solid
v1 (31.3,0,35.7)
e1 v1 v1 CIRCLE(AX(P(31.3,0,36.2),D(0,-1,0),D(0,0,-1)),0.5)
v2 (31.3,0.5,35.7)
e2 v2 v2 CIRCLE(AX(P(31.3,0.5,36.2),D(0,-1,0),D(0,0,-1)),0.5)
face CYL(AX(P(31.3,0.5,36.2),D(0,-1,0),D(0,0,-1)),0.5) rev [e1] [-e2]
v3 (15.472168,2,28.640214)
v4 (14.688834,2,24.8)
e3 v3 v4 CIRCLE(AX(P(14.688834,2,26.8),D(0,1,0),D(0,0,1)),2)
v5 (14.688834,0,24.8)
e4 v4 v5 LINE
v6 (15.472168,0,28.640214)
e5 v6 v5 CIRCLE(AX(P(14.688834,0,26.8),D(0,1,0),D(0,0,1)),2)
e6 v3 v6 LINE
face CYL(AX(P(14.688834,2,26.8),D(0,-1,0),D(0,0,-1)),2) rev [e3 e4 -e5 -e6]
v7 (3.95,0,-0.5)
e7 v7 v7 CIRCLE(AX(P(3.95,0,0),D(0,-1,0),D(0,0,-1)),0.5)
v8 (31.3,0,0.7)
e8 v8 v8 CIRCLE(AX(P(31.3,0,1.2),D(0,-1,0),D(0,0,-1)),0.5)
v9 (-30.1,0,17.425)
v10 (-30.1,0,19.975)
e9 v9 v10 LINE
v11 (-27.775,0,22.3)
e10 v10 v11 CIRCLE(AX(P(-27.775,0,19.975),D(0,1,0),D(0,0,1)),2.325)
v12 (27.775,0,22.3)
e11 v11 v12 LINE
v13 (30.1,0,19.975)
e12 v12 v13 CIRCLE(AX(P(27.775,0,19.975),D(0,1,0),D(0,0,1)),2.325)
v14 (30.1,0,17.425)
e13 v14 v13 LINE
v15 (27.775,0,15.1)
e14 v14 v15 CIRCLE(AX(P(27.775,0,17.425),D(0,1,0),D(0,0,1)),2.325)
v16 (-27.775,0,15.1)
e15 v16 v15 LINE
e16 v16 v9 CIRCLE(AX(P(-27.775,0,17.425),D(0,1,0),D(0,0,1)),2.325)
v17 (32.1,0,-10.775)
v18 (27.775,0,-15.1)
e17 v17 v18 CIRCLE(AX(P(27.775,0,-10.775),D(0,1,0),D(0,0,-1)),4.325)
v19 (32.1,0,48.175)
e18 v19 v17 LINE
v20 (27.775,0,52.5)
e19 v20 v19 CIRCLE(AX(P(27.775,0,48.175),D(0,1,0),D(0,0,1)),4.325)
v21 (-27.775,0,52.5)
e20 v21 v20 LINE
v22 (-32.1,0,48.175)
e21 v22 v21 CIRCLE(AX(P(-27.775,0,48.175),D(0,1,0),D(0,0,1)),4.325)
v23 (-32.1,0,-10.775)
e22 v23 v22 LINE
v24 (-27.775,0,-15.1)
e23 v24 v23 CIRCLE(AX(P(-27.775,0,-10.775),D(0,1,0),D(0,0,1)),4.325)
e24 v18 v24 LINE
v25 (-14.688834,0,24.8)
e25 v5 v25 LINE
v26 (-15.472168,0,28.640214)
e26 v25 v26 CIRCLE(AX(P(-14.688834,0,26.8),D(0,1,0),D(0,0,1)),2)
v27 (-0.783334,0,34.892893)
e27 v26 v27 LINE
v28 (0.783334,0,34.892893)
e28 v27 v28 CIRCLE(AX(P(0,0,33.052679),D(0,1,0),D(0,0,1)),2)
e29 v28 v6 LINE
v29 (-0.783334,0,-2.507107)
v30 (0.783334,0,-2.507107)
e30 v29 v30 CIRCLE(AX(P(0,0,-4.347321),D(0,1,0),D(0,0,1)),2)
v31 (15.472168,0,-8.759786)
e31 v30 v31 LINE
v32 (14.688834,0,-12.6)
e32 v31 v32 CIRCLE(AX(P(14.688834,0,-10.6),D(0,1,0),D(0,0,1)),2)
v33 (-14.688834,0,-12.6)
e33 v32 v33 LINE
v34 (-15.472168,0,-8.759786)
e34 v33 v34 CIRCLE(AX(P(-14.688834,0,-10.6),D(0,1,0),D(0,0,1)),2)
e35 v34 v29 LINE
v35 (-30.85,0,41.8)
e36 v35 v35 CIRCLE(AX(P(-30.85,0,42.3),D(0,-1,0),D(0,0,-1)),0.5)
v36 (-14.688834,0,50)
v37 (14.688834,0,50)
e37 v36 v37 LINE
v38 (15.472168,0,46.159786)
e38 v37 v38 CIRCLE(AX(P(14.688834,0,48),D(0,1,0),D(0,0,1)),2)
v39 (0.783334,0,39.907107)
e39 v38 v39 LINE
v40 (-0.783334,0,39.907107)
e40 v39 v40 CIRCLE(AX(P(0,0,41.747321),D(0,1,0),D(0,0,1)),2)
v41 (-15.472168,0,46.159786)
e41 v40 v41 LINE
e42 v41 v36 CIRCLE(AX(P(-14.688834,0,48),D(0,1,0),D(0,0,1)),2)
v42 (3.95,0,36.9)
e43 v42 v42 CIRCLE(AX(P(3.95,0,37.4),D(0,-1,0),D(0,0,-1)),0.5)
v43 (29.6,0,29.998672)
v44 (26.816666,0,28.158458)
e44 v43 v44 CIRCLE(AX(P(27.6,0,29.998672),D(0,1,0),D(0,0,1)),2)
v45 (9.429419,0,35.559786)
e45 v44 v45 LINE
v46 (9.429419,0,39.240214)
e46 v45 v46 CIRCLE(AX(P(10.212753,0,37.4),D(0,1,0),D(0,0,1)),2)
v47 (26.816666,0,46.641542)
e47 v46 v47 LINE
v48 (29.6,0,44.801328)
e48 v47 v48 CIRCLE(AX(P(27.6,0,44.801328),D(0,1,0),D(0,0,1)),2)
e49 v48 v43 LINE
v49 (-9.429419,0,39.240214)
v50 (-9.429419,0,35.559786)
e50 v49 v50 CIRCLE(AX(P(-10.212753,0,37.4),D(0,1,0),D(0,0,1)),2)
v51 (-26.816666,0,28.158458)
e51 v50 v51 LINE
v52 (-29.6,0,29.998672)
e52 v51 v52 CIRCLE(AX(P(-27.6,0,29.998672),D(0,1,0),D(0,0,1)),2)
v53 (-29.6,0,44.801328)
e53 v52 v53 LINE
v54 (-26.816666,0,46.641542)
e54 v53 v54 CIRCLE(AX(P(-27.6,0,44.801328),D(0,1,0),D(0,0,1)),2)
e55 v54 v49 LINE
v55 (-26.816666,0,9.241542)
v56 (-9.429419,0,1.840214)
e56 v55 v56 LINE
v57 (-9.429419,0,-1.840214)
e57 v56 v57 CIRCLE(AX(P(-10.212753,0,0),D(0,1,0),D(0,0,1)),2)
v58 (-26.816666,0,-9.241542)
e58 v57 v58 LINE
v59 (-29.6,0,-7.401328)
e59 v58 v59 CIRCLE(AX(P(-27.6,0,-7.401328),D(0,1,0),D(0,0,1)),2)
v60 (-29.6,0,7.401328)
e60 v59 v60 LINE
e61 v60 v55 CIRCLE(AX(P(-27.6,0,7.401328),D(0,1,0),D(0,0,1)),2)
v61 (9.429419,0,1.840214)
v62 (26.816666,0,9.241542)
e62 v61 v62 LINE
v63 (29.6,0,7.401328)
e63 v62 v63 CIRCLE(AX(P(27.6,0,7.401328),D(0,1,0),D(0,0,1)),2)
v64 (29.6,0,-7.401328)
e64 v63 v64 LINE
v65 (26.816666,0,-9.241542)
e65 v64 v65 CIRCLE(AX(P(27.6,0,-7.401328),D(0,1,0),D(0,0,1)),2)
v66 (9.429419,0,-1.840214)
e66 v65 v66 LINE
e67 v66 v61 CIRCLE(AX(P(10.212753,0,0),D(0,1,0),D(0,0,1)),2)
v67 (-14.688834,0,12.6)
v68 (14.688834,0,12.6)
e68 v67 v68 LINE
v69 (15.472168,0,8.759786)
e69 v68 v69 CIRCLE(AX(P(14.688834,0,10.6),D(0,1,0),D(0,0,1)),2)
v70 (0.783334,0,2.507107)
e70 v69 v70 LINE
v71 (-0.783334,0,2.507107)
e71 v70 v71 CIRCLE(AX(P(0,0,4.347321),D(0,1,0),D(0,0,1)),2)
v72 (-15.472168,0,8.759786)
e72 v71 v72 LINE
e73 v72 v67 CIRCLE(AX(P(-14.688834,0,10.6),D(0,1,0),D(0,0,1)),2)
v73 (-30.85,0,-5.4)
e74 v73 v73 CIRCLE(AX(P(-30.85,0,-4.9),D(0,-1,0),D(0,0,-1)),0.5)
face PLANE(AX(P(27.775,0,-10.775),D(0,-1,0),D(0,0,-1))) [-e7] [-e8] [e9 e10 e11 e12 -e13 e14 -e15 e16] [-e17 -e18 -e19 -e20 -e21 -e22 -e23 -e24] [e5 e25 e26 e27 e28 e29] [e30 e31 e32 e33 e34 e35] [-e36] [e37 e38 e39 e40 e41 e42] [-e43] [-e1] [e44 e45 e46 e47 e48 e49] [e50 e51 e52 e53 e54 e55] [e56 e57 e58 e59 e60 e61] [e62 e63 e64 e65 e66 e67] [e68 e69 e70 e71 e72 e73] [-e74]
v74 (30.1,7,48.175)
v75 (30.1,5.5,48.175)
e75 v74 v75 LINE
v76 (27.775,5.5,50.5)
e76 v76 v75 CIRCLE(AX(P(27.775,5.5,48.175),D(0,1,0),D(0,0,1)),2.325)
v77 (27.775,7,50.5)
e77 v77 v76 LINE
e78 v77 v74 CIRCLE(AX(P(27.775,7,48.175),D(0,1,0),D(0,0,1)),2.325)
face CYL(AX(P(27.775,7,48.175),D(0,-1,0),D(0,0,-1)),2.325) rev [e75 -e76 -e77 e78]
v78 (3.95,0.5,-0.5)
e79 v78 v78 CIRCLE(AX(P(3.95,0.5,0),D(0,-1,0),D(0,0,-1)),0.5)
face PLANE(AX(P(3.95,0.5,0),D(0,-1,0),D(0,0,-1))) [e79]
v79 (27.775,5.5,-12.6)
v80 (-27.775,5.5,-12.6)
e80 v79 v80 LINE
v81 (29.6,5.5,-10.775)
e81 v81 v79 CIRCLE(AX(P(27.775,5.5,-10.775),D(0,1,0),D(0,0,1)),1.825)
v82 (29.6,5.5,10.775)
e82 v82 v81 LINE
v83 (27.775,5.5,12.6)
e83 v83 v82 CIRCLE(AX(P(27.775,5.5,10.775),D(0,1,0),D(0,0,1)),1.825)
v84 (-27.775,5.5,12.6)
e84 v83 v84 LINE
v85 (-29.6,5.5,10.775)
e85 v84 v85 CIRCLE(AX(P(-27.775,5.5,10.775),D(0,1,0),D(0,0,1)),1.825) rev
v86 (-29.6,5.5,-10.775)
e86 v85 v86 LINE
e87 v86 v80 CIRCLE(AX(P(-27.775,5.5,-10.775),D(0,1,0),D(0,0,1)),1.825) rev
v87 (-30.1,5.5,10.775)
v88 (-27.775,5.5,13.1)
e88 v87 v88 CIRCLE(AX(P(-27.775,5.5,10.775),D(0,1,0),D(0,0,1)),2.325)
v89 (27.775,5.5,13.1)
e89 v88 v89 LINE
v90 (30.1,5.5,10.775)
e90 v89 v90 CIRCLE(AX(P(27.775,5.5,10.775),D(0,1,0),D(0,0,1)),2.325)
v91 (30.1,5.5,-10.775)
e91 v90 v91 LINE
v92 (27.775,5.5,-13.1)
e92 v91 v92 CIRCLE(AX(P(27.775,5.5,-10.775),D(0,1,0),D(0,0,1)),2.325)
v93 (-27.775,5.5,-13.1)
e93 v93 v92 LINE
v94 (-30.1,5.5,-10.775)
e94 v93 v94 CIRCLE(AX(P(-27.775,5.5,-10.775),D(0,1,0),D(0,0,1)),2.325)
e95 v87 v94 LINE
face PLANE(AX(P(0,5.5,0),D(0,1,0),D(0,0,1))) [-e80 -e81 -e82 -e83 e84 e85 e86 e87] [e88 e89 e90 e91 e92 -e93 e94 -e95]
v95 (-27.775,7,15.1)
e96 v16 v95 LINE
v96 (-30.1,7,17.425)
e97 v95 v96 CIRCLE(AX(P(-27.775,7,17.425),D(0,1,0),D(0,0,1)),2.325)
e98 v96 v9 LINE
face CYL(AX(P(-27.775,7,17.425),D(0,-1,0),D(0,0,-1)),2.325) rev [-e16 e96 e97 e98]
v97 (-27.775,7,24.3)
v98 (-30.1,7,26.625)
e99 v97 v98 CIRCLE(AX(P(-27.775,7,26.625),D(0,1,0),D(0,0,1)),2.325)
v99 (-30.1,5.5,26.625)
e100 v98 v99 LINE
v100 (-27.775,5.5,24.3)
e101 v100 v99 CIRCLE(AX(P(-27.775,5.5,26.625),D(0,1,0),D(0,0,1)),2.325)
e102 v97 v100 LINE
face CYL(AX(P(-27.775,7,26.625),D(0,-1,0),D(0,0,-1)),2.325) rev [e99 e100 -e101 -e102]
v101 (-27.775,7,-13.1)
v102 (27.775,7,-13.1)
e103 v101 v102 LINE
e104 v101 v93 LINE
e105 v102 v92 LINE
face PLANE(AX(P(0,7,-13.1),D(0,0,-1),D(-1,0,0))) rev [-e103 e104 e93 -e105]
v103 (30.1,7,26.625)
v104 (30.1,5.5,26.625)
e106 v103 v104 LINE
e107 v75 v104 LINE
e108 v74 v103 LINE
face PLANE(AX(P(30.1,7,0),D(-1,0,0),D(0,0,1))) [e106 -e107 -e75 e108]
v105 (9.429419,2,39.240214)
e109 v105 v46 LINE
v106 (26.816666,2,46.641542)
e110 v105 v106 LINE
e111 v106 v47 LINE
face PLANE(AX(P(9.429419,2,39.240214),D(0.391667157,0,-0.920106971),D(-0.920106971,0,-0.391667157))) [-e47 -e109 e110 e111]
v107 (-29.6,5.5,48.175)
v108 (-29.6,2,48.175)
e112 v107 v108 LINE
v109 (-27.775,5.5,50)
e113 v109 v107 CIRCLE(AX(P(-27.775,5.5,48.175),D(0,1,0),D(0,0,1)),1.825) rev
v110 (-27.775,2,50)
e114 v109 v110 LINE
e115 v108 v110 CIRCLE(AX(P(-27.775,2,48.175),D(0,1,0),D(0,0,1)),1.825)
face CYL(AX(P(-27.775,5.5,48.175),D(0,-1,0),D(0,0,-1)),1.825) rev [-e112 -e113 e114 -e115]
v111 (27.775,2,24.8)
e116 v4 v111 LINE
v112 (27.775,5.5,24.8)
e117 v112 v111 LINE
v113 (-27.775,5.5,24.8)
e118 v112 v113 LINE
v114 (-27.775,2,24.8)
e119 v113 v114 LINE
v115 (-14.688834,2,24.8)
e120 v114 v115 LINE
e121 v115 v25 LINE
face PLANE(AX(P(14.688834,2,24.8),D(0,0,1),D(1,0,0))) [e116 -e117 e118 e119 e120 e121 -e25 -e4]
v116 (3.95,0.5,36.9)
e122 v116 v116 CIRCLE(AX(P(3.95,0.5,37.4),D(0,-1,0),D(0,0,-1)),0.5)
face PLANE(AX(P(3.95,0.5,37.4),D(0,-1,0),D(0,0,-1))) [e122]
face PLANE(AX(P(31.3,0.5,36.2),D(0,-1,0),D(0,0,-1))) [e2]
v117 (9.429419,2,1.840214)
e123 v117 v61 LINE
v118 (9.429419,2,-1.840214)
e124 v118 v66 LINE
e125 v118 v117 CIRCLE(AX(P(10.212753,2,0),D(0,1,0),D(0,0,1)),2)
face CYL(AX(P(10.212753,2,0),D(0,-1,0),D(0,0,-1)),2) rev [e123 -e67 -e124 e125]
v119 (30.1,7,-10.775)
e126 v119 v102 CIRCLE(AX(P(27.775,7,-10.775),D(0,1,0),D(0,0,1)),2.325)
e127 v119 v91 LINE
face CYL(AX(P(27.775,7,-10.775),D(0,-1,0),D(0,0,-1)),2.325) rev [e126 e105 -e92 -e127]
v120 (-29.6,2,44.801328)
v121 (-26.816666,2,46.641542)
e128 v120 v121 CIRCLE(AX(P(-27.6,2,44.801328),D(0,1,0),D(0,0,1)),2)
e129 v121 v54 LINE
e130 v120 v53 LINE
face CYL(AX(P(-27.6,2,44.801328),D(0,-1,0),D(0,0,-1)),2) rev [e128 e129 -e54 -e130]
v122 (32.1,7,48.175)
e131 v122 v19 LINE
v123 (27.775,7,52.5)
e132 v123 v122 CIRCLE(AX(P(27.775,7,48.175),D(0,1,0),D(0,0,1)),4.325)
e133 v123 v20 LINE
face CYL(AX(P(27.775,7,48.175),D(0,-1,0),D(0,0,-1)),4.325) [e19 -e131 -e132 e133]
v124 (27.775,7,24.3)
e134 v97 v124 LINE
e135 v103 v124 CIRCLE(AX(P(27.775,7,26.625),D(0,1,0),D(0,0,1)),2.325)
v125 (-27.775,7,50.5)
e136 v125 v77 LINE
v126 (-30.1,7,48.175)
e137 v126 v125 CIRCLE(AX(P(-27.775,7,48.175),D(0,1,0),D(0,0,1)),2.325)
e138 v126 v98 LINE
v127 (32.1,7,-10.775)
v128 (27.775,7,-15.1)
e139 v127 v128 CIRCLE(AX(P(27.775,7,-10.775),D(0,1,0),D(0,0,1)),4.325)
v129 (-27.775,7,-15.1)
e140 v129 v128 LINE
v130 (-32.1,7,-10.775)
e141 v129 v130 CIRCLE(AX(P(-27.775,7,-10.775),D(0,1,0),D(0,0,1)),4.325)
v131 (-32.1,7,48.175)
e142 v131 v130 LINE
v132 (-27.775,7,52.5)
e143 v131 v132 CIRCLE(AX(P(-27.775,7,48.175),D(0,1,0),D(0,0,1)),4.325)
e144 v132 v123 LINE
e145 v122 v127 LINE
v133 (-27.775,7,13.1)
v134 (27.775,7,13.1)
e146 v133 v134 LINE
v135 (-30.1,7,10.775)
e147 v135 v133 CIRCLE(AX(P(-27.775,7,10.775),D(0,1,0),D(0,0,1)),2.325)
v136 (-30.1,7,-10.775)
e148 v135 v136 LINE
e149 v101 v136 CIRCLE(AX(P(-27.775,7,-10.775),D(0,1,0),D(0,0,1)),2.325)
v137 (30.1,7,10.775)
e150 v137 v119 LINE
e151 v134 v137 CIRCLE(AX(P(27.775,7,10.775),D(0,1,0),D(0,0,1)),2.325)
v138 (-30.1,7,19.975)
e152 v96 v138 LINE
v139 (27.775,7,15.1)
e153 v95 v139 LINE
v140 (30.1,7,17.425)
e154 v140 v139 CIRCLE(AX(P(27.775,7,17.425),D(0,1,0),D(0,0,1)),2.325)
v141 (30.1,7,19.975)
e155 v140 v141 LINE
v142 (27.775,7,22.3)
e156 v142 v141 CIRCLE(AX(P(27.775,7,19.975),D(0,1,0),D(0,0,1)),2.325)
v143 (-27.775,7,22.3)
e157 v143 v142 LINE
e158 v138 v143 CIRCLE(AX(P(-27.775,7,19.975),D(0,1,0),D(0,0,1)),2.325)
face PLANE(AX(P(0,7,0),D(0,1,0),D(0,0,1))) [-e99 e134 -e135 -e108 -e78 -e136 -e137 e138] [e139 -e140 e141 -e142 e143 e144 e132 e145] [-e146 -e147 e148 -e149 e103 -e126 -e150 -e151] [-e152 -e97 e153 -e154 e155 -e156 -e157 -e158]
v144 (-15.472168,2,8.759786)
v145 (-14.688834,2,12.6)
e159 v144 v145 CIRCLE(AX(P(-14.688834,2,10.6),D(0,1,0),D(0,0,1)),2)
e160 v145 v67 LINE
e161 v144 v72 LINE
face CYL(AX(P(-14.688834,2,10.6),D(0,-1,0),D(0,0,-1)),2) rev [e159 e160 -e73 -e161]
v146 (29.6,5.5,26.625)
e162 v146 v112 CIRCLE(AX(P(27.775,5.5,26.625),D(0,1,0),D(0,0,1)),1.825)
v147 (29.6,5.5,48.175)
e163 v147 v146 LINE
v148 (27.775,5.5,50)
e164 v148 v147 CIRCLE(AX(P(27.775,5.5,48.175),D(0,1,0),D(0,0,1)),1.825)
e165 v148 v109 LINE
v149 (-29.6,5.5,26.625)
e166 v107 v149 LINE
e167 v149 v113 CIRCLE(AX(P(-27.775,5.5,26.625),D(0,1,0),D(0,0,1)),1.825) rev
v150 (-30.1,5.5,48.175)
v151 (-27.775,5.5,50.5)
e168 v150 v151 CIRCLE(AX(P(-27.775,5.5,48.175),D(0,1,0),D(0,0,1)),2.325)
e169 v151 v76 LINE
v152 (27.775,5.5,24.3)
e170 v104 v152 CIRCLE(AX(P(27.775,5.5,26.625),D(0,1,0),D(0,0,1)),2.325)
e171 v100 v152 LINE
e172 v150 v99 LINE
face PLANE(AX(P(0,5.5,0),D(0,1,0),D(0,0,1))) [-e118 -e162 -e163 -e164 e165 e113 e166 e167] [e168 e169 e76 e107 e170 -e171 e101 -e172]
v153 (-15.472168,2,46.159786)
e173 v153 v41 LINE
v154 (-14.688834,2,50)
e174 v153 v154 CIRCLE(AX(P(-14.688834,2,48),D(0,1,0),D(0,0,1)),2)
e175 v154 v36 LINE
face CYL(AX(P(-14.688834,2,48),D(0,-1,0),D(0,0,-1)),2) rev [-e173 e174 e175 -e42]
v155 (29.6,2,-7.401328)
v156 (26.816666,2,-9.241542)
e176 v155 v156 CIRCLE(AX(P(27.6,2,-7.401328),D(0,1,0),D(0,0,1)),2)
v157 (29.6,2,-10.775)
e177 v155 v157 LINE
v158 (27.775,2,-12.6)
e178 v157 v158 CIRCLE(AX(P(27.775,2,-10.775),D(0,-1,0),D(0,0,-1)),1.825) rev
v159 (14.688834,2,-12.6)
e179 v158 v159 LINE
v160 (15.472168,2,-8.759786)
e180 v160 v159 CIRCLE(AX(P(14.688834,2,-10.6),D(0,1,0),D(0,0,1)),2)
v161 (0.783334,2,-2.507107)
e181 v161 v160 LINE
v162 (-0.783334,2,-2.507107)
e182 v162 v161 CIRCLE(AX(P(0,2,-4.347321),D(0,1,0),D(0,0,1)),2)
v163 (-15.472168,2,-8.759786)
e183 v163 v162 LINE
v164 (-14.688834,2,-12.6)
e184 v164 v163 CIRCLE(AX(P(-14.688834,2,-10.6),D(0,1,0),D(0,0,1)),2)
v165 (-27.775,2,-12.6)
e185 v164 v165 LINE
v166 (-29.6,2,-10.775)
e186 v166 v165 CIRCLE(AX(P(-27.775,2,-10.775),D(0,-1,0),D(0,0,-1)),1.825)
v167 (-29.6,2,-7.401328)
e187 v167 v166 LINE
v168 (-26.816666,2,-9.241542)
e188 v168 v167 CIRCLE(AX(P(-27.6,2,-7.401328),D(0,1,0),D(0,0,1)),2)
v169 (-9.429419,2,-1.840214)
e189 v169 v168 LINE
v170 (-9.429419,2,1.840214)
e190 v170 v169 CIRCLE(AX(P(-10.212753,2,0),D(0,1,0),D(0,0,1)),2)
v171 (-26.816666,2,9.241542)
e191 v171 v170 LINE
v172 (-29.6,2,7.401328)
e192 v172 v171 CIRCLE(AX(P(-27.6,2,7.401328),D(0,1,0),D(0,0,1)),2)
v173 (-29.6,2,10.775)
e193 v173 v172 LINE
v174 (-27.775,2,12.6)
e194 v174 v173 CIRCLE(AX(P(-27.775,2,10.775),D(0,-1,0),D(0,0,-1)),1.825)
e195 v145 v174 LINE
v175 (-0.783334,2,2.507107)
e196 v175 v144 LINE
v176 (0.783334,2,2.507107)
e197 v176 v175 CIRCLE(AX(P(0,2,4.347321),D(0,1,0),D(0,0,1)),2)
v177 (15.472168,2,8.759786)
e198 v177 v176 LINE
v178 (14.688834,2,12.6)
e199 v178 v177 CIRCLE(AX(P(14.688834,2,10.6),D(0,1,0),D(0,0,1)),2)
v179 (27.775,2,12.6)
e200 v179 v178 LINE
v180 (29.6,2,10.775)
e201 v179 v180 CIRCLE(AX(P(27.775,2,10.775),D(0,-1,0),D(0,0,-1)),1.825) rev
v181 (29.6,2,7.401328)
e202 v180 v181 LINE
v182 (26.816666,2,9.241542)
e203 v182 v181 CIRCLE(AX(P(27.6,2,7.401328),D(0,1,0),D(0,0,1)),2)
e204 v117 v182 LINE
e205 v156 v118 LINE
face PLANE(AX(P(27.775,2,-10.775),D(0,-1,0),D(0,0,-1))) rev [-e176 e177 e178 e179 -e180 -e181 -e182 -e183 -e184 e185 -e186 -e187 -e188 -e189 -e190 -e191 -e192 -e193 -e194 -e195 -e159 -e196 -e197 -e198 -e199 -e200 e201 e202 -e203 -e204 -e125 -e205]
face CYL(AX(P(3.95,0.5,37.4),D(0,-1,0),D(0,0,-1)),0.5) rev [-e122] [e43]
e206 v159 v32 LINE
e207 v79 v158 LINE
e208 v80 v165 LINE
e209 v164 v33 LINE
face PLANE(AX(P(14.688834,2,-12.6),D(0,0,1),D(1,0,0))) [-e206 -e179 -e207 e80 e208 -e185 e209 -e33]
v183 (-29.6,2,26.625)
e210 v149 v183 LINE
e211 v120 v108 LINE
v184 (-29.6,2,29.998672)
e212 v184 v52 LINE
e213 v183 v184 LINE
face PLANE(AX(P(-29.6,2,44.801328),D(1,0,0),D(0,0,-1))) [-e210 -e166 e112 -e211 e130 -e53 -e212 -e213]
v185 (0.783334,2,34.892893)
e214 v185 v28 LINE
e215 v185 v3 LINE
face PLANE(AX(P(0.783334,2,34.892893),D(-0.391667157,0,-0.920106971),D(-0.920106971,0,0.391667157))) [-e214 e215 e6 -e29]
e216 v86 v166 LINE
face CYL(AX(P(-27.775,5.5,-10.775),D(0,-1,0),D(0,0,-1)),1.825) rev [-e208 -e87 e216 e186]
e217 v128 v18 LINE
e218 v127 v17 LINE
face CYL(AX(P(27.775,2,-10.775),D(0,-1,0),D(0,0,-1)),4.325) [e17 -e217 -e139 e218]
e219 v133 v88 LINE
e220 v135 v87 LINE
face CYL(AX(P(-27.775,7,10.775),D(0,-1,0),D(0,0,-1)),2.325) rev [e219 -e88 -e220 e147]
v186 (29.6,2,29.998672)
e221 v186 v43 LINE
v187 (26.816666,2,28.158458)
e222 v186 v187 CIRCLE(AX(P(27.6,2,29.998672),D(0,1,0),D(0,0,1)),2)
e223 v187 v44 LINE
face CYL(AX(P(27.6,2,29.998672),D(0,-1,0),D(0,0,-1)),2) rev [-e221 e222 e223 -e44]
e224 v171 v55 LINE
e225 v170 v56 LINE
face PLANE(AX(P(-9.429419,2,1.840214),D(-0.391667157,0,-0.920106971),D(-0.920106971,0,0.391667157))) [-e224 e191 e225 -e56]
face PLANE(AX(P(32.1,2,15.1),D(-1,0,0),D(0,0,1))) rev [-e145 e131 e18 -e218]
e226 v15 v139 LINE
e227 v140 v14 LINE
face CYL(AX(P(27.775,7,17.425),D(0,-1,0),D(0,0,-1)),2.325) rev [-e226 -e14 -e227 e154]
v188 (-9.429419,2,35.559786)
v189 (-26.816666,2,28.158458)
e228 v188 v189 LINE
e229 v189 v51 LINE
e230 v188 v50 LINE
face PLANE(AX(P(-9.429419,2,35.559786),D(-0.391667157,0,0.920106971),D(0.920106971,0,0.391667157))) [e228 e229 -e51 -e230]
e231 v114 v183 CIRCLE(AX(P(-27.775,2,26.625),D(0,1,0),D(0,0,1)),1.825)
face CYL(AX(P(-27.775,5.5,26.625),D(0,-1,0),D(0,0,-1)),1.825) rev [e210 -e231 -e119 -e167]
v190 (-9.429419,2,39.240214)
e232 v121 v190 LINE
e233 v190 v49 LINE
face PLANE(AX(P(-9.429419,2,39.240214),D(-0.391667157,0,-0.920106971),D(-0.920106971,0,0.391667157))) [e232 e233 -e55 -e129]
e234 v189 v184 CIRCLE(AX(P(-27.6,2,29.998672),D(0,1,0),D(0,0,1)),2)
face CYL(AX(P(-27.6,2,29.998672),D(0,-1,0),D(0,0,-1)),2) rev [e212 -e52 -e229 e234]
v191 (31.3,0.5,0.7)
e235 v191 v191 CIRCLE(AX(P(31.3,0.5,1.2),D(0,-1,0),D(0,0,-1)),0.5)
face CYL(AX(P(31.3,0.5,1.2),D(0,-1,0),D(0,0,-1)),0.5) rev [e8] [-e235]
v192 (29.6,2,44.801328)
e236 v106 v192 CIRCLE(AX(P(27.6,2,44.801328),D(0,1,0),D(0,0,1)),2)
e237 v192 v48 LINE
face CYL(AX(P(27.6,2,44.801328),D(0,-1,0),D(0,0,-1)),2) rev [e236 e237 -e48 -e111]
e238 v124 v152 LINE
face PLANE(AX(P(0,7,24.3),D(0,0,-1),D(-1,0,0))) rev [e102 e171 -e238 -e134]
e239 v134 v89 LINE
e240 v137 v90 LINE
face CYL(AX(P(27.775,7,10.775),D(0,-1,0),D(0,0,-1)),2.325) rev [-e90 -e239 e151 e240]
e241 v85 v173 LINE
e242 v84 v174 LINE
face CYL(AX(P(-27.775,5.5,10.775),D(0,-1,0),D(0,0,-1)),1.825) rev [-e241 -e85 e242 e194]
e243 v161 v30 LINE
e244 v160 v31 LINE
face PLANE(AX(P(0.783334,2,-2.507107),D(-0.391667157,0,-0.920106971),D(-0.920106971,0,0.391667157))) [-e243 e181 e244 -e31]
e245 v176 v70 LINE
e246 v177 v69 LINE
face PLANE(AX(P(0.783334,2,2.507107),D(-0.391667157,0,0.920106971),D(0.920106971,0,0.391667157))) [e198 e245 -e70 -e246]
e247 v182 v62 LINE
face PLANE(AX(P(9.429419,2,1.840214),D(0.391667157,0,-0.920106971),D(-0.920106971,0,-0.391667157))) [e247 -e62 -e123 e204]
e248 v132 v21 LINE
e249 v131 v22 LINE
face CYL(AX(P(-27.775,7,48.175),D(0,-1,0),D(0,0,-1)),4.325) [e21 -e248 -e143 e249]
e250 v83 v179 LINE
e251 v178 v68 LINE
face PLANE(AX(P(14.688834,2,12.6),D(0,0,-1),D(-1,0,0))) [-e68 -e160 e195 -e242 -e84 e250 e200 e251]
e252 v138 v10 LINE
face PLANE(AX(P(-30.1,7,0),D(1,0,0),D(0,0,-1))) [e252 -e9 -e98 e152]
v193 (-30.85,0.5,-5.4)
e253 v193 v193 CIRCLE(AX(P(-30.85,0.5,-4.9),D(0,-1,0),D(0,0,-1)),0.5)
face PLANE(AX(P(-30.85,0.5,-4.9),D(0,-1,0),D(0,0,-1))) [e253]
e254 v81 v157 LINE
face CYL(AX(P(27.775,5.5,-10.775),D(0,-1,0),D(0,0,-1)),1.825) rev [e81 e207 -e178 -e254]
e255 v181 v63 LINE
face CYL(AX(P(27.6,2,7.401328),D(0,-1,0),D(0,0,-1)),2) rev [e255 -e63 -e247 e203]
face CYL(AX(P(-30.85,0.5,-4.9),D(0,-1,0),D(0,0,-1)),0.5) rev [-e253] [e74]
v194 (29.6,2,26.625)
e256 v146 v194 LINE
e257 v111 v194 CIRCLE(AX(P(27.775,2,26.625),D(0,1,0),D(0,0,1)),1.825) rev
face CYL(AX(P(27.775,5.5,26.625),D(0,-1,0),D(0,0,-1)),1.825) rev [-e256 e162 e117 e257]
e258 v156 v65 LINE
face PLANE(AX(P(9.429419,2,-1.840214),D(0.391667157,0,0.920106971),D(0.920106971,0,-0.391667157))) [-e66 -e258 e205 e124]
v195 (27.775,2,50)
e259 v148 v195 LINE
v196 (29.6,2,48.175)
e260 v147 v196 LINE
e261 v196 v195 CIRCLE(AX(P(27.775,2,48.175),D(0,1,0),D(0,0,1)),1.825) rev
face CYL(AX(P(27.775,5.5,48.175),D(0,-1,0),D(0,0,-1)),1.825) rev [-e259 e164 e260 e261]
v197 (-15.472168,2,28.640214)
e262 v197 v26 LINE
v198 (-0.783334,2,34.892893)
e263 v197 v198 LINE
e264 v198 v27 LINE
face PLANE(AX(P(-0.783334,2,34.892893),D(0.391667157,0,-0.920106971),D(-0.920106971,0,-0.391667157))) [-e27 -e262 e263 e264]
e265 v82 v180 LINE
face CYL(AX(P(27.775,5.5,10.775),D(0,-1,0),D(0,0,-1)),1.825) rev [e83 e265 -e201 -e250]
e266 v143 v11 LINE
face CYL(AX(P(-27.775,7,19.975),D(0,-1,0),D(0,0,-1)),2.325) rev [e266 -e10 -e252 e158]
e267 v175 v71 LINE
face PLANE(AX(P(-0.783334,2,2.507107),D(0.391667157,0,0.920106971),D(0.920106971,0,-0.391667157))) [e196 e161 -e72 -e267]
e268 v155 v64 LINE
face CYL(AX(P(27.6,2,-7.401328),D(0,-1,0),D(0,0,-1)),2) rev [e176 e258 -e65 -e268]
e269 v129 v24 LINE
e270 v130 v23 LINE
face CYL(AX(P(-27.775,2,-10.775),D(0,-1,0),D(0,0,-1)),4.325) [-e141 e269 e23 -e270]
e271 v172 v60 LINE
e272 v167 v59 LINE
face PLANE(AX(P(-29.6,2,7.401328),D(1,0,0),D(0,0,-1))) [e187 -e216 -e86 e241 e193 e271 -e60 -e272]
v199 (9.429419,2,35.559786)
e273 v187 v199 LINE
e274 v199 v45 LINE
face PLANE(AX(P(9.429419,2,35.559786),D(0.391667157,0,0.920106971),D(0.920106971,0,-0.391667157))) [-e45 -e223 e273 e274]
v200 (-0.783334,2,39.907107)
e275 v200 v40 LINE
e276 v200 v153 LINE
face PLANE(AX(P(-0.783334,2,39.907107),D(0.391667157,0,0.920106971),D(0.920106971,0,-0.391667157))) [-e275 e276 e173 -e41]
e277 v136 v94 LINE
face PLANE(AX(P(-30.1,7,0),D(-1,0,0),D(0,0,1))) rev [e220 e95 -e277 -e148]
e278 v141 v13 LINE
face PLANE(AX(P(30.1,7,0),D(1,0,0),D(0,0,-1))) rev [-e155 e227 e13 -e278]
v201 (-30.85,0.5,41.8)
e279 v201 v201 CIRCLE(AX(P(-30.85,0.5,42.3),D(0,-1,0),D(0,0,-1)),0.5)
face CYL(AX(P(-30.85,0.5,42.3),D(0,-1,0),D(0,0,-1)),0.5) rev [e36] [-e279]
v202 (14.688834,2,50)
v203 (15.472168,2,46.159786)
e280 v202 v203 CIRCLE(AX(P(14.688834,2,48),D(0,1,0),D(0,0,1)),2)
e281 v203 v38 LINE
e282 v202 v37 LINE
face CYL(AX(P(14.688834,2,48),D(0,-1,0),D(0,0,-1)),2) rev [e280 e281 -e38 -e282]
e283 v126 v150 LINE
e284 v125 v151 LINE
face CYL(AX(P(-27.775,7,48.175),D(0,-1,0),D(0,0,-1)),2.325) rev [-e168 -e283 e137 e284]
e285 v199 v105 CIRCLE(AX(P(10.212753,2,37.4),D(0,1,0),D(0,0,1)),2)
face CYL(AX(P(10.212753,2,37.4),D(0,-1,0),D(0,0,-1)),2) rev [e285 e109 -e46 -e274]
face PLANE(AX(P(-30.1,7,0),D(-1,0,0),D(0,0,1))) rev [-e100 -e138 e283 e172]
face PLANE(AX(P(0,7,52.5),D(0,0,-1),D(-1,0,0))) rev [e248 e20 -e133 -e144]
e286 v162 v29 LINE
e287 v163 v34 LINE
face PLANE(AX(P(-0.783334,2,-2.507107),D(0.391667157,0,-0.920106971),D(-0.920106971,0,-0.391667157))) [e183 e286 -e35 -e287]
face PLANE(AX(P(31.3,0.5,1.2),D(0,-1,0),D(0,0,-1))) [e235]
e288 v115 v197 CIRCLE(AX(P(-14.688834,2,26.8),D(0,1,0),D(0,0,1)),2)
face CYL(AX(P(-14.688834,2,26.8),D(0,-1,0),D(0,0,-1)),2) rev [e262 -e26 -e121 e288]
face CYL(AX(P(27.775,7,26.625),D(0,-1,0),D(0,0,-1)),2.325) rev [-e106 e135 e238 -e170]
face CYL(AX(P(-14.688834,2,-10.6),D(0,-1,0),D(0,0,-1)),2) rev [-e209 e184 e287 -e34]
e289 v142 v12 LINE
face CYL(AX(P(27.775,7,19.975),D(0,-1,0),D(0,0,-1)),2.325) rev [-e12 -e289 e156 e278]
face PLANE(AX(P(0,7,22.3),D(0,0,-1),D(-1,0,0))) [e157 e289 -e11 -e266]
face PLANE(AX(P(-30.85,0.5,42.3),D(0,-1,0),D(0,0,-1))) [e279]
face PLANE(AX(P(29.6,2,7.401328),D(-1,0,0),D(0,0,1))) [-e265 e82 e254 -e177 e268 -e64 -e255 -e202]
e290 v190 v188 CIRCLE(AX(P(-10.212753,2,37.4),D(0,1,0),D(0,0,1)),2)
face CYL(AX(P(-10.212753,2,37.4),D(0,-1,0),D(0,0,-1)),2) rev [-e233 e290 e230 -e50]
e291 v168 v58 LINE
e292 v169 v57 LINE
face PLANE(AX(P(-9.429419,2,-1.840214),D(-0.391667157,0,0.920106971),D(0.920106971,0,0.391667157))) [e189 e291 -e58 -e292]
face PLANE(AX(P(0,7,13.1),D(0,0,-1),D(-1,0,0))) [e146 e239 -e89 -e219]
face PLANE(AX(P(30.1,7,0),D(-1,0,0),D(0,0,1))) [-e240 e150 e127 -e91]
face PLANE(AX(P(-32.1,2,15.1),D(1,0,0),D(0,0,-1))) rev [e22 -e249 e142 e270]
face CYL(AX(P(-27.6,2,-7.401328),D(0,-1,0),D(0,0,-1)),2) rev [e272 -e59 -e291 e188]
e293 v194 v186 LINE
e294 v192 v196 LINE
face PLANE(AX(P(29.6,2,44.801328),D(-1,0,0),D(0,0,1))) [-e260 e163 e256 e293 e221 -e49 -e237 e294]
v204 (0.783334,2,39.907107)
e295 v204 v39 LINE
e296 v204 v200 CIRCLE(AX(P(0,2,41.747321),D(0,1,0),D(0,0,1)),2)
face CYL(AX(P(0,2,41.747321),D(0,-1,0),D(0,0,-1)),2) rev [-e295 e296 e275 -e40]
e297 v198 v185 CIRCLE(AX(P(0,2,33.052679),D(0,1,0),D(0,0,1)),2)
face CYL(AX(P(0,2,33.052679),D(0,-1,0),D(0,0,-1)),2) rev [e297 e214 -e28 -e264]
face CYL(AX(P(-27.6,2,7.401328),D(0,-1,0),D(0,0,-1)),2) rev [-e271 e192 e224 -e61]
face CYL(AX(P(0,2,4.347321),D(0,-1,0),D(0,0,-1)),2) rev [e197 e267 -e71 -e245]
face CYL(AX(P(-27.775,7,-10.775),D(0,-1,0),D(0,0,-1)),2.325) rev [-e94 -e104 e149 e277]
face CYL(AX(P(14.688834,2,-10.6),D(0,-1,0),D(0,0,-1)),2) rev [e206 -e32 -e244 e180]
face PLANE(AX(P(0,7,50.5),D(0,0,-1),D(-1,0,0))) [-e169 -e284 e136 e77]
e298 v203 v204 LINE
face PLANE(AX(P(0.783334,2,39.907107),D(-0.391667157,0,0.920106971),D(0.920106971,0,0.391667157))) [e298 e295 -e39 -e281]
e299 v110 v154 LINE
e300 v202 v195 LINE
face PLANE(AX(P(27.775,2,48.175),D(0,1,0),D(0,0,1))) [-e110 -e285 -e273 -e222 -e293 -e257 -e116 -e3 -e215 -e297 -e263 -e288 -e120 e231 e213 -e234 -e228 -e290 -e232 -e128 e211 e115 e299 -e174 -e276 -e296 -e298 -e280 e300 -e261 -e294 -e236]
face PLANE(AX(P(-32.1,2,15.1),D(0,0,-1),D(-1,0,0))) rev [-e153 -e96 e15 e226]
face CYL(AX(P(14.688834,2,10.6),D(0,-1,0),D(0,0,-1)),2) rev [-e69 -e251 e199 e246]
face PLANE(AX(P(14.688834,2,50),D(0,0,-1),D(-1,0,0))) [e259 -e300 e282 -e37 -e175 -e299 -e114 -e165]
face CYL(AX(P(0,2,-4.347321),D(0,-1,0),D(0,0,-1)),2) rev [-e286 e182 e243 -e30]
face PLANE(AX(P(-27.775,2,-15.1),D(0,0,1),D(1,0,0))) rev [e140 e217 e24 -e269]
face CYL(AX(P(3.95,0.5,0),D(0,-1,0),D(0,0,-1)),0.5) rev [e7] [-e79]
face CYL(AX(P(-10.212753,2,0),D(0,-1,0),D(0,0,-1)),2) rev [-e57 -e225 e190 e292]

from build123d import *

# Parameters (mm, degrees)
EXTRUDE_1_DEPTH     = 2
EXTRUDE_1_2_DEPTH   = 2
EXTRUDE_2_DEPTH     = 7
SKETCH_2_W          = 60.2
SKETCH_2_H          = 26.2
EXTRUDE_3_DEPTH     = 5.5
SKETCH_4_R          = 0.5
CUT_EXTRUDE_1_DEPTH = 0.5


with BuildPart() as part:
    # Эскиз1 → Бобышка-Вытянуть1 (new body)
    with BuildSketch(Plane(origin=(0, 0, 0), x_dir=(1, 0, 0), z_dir=(0, 1, 0))):
        with BuildLine():
            Line((-32.1, -15.1), (32.1, -15.1))
            Line((32.1, -15.1), (32.1, 10.775))
            ThreePointArc((32.1, 10.775), (30.833236829, 13.833236829), (27.775, 15.1))
            Line((27.775, 15.1), (-27.775, 15.1))
            ThreePointArc((-27.775, 15.1), (-30.833236829, 13.833236829), (-32.1, 10.775))
            Line((-32.1, 10.775), (-32.1, -15.1))
        make_face()
        with BuildLine():
            Line((14.68883412, -12.6), (-14.68883412, -12.6))
            ThreePointArc((-14.68883412, -12.6), (-16.648480502, -10.999732483), (-15.472168434, -8.759786058))
            Line((-15.472168434, -8.759786058), (-0.783334313, -2.507106669))
            ThreePointArc((-0.783334313, -2.507106669), (0, -2.347320611), (0.783334313, -2.507106669))
            Line((0.783334313, -2.507106669), (15.472168434, -8.759786058))
            ThreePointArc((15.472168434, -8.759786058), (16.648480502, -10.999732483), (14.68883412, -12.6))
        make_face(mode=Mode.SUBTRACT)
        with BuildLine():
            Line((29.6, -7.401328038), (29.6, 7.401328038))
            ThreePointArc((29.6, 7.401328038), (28.703025696, 9.069660832), (26.816665687, 9.24154198))
            Line((26.816665687, 9.24154198), (9.429418868, 1.840213942))
            ThreePointArc((9.429418868, 1.840213942), (8.212753181, 0), (9.429418868, -1.840213942))
            Line((9.429418868, -1.840213942), (26.816665687, -9.24154198))
            ThreePointArc((26.816665687, -9.24154198), (28.703025696, -9.069660832), (29.6, -7.401328038))
        make_face(mode=Mode.SUBTRACT)
        with BuildLine():
            Line((14.68883412, 12.6), (-14.68883412, 12.6))
            ThreePointArc((-14.68883412, 12.6), (-16.648480502, 10.999732483), (-15.472168434, 8.759786058))
            Line((-15.472168434, 8.759786058), (-0.783334313, 2.507106669))
            ThreePointArc((-0.783334313, 2.507106669), (0, 2.347320611), (0.783334313, 2.507106669))
            Line((0.783334313, 2.507106669), (15.472168434, 8.759786058))
            ThreePointArc((15.472168434, 8.759786058), (16.648480502, 10.999732483), (14.68883412, 12.6))
        make_face(mode=Mode.SUBTRACT)
        with BuildLine():
            Line((-29.6, -7.401328038), (-29.6, 7.401328038))
            ThreePointArc((-29.6, 7.401328038), (-28.703025696, 9.069660832), (-26.816665687, 9.24154198))
            Line((-26.816665687, 9.24154198), (-9.429418868, 1.840213942))
            ThreePointArc((-9.429418868, 1.840213942), (-8.212753181, 0), (-9.429418868, -1.840213942))
            Line((-9.429418868, -1.840213942), (-26.816665687, -9.24154198))
            ThreePointArc((-26.816665687, -9.24154198), (-28.703025696, -9.069660832), (-29.6, -7.401328038))
        make_face(mode=Mode.SUBTRACT)
    extrude(amount=EXTRUDE_1_DEPTH)



with BuildPart() as body_2:
    # Эскиз1 → Extrude 1 2 (new body)
    with BuildSketch(Plane(origin=(0, 0, 0), x_dir=(1, 0, 0), z_dir=(0, 1, 0))):
        with BuildLine():
            Line((-27.775, -52.5), (27.775, -52.5))
            ThreePointArc((27.775, -52.5), (30.833236829, -51.233236829), (32.1, -48.175))
            Line((32.1, -48.175), (32.1, -22.3))
            Line((32.1, -22.3), (-32.1, -22.3))
            Line((-32.1, -22.3), (-32.1, -48.175))
            ThreePointArc((-32.1, -48.175), (-30.833236829, -51.233236829), (-27.775, -52.5))
        make_face()
        with BuildLine():
            Line((-0.783334313, -34.892893331), (-15.472168434, -28.640213942))
            ThreePointArc((-15.472168434, -28.640213942), (-16.648480502, -26.400267517), (-14.68883412, -24.8))
            Line((-14.68883412, -24.8), (14.68883412, -24.8))
            ThreePointArc((14.68883412, -24.8), (16.648480502, -26.400267517), (15.472168434, -28.640213942))
            Line((15.472168434, -28.640213942), (0.783334313, -34.892893331))
            ThreePointArc((0.783334313, -34.892893331), (0, -35.052679389), (-0.783334313, -34.892893331))
        make_face(mode=Mode.SUBTRACT)
        with BuildLine():
            Line((-9.429418868, -39.240213942), (-26.816665687, -46.64154198))
            ThreePointArc((-26.816665687, -46.64154198), (-28.703025696, -46.469660832), (-29.6, -44.801328038))
            Line((-29.6, -44.801328038), (-29.6, -29.998671962))
            ThreePointArc((-29.6, -29.998671962), (-28.703025696, -28.330339168), (-26.816665687, -28.15845802))
            Line((-26.816665687, -28.15845802), (-9.429418868, -35.559786058))
            ThreePointArc((-9.429418868, -35.559786058), (-8.212753181, -37.4), (-9.429418868, -39.240213942))
        make_face(mode=Mode.SUBTRACT)
        with BuildLine():
            Line((0.783334313, -39.907106669), (15.472168434, -46.159786058))
            ThreePointArc((15.472168434, -46.159786058), (16.648480502, -48.399732483), (14.68883412, -50))
            Line((14.68883412, -50), (-14.68883412, -50))
            ThreePointArc((-14.68883412, -50), (-16.648480502, -48.399732483), (-15.472168434, -46.159786058))
            Line((-15.472168434, -46.159786058), (-0.783334313, -39.907106669))
            ThreePointArc((-0.783334313, -39.907106669), (0, -39.747320611), (0.783334313, -39.907106669))
        make_face(mode=Mode.SUBTRACT)
        with BuildLine():
            Line((29.6, -44.801328038), (29.6, -29.998671962))
            ThreePointArc((29.6, -29.998671962), (28.703025696, -28.330339168), (26.816665687, -28.15845802))
            Line((26.816665687, -28.15845802), (9.429418868, -35.559786058))
            ThreePointArc((9.429418868, -35.559786058), (8.212753181, -37.4), (9.429418868, -39.240213942))
            Line((9.429418868, -39.240213942), (26.816665687, -46.64154198))
            ThreePointArc((26.816665687, -46.64154198), (28.703025696, -46.469660832), (29.6, -44.801328038))
        make_face(mode=Mode.SUBTRACT)
    extrude(amount=EXTRUDE_1_2_DEPTH)


with BuildPart() as part_1:
    add(part.part)

    add(body_2.part)  # Бобышка-Вытянуть2 merges body 2
    # Эскиз3 → Бобышка-Вытянуть2 (add)
    with BuildSketch(Plane(origin=(0, 0, 0), x_dir=(1, 0, 0), z_dir=(0, 1, 0))):
        with BuildLine():
            Line((-32.1, 10.775), (-32.1, -15.1))
            Line((-32.1, -15.1), (-32.1, -22.3))
            Line((-32.1, -22.3), (-32.1, -48.175))
            ThreePointArc((-32.1, -48.175), (-30.833236829, -51.233236829), (-27.775, -52.5))
            Line((-27.775, -52.5), (27.775, -52.5))
            ThreePointArc((27.775, -52.5), (30.833236829, -51.233236829), (32.1, -48.175))
            Line((32.1, -48.175), (32.1, -22.3))
            Line((32.1, -22.3), (32.1, -15.1))
            Line((32.1, -15.1), (32.1, 10.775))
            ThreePointArc((32.1, 10.775), (30.833236829, 13.833236829), (27.775, 15.1))
            Line((27.775, 15.1), (-27.775, 15.1))
            ThreePointArc((-27.775, 15.1), (-30.833236829, 13.833236829), (-32.1, 10.775))
        make_face()
        with BuildLine():
            ThreePointArc((-27.775, -50.5), (-29.419023266, -49.819023266), (-30.1, -48.175))
            Line((-30.1, -48.175), (-30.1, -26.625))
            ThreePointArc((-30.1, -26.625), (-29.419023266, -24.980976734), (-27.775, -24.3))
            Line((-27.775, -24.3), (27.775, -24.3))
            ThreePointArc((27.775, -24.3), (29.419023266, -24.980976734), (30.1, -26.625))
            Line((30.1, -26.625), (30.1, -48.175))
            ThreePointArc((30.1, -48.175), (29.419023266, -49.819023266), (27.775, -50.5))
            Line((27.775, -50.5), (-27.775, -50.5))
        make_face(mode=Mode.SUBTRACT)
        with BuildLine():
            Line((-30.1, -19.975), (-30.1, -17.425))
            ThreePointArc((-30.1, -17.425), (-29.419023266, -15.780976734), (-27.775, -15.1))
            Line((-27.775, -15.1), (27.775, -15.1))
            ThreePointArc((27.775, -15.1), (29.419023266, -15.780976734), (30.1, -17.425))
            Line((30.1, -17.425), (30.1, -19.975))
            ThreePointArc((30.1, -19.975), (29.419023266, -21.619023266), (27.775, -22.3))
            Line((27.775, -22.3), (-27.775, -22.3))
            ThreePointArc((-27.775, -22.3), (-29.419023266, -21.619023266), (-30.1, -19.975))
        make_face(mode=Mode.SUBTRACT)
        with BuildLine():
            Line((27.775, -13.1), (-27.775, -13.1))
            ThreePointArc((-27.775, -13.1), (-29.419023266, -12.419023266), (-30.1, -10.775))
            Line((-30.1, -10.775), (-30.1, 10.775))
            ThreePointArc((-30.1, 10.775), (-29.419023266, 12.419023266), (-27.775, 13.1))
            Line((-27.775, 13.1), (27.775, 13.1))
            ThreePointArc((27.775, 13.1), (29.419023266, 12.419023266), (30.1, 10.775))
            Line((30.1, 10.775), (30.1, -10.775))
            ThreePointArc((30.1, -10.775), (29.419023266, -12.419023266), (27.775, -13.1))
        make_face(mode=Mode.SUBTRACT)
    extrude(amount=EXTRUDE_2_DEPTH)

    # Эскиз2 → Бобышка-Вытянуть3 (add)
    # profile 1 of 2: a face of its own
    with BuildSketch(Plane(origin=(0, 0, 0), x_dir=(1, 0, 0), z_dir=(0, 1, 0))):
        Rectangle(SKETCH_2_W, SKETCH_2_H)
        with BuildLine():
            ThreePointArc((29.6, -10.775), (29.065469876, -12.065469876), (27.775, -12.6))
            Line((27.775, -12.6), (-27.775, -12.6))
            ThreePointArc((-27.775, -12.6), (-29.065469876, -12.065469876), (-29.6, -10.775))
            Line((-29.6, -10.775), (-29.6, 10.775))
            ThreePointArc((-29.6, 10.775), (-29.065469876, 12.065469876), (-27.775, 12.6))
            Line((-27.775, 12.6), (27.775, 12.6))
            ThreePointArc((27.775, 12.6), (29.065469876, 12.065469876), (29.6, 10.775))
            Line((29.6, 10.775), (29.6, -10.775))
        make_face(mode=Mode.SUBTRACT)
    # profile 2 of 2: a face of its own
    with BuildSketch(Plane(origin=(0, 0, 0), x_dir=(1, 0, 0), z_dir=(0, 1, 0))):
        with Locations((0, -37.4)):
            Rectangle(SKETCH_2_W, SKETCH_2_H)
        with BuildLine():
            Line((-27.775, -24.8), (27.775, -24.8))
            ThreePointArc((27.775, -24.8), (29.065469876, -25.334530124), (29.6, -26.625))
            Line((29.6, -26.625), (29.6, -48.175))
            ThreePointArc((29.6, -48.175), (29.065469876, -49.465469876), (27.775, -50))
            Line((27.775, -50), (-27.775, -50))
            ThreePointArc((-27.775, -50), (-29.065469876, -49.465469876), (-29.6, -48.175))
            Line((-29.6, -48.175), (-29.6, -26.625))
            ThreePointArc((-29.6, -26.625), (-29.065469876, -25.334530124), (-27.775, -24.8))
        make_face(mode=Mode.SUBTRACT)
    extrude(amount=EXTRUDE_3_DEPTH)

    # Эскиз4 → Вырез-Вытянуть1 (cut)
    with BuildSketch(Plane.XZ):
        with Locations((-30.85, 42.3)):
            Circle(SKETCH_4_R)
        with Locations((3.95, 37.4)):
            Circle(SKETCH_4_R)
        with Locations((31.3, 36.2)):
            Circle(SKETCH_4_R)
        with Locations((31.3, 1.2)):
            Circle(SKETCH_4_R)
        with Locations((3.95, 0)):
            Circle(SKETCH_4_R)
        with Locations((-30.85, -4.9)):
            Circle(SKETCH_4_R)
    extrude(amount=-CUT_EXTRUDE_1_DEPTH, mode=Mode.SUBTRACT)


solid = part_1.part
